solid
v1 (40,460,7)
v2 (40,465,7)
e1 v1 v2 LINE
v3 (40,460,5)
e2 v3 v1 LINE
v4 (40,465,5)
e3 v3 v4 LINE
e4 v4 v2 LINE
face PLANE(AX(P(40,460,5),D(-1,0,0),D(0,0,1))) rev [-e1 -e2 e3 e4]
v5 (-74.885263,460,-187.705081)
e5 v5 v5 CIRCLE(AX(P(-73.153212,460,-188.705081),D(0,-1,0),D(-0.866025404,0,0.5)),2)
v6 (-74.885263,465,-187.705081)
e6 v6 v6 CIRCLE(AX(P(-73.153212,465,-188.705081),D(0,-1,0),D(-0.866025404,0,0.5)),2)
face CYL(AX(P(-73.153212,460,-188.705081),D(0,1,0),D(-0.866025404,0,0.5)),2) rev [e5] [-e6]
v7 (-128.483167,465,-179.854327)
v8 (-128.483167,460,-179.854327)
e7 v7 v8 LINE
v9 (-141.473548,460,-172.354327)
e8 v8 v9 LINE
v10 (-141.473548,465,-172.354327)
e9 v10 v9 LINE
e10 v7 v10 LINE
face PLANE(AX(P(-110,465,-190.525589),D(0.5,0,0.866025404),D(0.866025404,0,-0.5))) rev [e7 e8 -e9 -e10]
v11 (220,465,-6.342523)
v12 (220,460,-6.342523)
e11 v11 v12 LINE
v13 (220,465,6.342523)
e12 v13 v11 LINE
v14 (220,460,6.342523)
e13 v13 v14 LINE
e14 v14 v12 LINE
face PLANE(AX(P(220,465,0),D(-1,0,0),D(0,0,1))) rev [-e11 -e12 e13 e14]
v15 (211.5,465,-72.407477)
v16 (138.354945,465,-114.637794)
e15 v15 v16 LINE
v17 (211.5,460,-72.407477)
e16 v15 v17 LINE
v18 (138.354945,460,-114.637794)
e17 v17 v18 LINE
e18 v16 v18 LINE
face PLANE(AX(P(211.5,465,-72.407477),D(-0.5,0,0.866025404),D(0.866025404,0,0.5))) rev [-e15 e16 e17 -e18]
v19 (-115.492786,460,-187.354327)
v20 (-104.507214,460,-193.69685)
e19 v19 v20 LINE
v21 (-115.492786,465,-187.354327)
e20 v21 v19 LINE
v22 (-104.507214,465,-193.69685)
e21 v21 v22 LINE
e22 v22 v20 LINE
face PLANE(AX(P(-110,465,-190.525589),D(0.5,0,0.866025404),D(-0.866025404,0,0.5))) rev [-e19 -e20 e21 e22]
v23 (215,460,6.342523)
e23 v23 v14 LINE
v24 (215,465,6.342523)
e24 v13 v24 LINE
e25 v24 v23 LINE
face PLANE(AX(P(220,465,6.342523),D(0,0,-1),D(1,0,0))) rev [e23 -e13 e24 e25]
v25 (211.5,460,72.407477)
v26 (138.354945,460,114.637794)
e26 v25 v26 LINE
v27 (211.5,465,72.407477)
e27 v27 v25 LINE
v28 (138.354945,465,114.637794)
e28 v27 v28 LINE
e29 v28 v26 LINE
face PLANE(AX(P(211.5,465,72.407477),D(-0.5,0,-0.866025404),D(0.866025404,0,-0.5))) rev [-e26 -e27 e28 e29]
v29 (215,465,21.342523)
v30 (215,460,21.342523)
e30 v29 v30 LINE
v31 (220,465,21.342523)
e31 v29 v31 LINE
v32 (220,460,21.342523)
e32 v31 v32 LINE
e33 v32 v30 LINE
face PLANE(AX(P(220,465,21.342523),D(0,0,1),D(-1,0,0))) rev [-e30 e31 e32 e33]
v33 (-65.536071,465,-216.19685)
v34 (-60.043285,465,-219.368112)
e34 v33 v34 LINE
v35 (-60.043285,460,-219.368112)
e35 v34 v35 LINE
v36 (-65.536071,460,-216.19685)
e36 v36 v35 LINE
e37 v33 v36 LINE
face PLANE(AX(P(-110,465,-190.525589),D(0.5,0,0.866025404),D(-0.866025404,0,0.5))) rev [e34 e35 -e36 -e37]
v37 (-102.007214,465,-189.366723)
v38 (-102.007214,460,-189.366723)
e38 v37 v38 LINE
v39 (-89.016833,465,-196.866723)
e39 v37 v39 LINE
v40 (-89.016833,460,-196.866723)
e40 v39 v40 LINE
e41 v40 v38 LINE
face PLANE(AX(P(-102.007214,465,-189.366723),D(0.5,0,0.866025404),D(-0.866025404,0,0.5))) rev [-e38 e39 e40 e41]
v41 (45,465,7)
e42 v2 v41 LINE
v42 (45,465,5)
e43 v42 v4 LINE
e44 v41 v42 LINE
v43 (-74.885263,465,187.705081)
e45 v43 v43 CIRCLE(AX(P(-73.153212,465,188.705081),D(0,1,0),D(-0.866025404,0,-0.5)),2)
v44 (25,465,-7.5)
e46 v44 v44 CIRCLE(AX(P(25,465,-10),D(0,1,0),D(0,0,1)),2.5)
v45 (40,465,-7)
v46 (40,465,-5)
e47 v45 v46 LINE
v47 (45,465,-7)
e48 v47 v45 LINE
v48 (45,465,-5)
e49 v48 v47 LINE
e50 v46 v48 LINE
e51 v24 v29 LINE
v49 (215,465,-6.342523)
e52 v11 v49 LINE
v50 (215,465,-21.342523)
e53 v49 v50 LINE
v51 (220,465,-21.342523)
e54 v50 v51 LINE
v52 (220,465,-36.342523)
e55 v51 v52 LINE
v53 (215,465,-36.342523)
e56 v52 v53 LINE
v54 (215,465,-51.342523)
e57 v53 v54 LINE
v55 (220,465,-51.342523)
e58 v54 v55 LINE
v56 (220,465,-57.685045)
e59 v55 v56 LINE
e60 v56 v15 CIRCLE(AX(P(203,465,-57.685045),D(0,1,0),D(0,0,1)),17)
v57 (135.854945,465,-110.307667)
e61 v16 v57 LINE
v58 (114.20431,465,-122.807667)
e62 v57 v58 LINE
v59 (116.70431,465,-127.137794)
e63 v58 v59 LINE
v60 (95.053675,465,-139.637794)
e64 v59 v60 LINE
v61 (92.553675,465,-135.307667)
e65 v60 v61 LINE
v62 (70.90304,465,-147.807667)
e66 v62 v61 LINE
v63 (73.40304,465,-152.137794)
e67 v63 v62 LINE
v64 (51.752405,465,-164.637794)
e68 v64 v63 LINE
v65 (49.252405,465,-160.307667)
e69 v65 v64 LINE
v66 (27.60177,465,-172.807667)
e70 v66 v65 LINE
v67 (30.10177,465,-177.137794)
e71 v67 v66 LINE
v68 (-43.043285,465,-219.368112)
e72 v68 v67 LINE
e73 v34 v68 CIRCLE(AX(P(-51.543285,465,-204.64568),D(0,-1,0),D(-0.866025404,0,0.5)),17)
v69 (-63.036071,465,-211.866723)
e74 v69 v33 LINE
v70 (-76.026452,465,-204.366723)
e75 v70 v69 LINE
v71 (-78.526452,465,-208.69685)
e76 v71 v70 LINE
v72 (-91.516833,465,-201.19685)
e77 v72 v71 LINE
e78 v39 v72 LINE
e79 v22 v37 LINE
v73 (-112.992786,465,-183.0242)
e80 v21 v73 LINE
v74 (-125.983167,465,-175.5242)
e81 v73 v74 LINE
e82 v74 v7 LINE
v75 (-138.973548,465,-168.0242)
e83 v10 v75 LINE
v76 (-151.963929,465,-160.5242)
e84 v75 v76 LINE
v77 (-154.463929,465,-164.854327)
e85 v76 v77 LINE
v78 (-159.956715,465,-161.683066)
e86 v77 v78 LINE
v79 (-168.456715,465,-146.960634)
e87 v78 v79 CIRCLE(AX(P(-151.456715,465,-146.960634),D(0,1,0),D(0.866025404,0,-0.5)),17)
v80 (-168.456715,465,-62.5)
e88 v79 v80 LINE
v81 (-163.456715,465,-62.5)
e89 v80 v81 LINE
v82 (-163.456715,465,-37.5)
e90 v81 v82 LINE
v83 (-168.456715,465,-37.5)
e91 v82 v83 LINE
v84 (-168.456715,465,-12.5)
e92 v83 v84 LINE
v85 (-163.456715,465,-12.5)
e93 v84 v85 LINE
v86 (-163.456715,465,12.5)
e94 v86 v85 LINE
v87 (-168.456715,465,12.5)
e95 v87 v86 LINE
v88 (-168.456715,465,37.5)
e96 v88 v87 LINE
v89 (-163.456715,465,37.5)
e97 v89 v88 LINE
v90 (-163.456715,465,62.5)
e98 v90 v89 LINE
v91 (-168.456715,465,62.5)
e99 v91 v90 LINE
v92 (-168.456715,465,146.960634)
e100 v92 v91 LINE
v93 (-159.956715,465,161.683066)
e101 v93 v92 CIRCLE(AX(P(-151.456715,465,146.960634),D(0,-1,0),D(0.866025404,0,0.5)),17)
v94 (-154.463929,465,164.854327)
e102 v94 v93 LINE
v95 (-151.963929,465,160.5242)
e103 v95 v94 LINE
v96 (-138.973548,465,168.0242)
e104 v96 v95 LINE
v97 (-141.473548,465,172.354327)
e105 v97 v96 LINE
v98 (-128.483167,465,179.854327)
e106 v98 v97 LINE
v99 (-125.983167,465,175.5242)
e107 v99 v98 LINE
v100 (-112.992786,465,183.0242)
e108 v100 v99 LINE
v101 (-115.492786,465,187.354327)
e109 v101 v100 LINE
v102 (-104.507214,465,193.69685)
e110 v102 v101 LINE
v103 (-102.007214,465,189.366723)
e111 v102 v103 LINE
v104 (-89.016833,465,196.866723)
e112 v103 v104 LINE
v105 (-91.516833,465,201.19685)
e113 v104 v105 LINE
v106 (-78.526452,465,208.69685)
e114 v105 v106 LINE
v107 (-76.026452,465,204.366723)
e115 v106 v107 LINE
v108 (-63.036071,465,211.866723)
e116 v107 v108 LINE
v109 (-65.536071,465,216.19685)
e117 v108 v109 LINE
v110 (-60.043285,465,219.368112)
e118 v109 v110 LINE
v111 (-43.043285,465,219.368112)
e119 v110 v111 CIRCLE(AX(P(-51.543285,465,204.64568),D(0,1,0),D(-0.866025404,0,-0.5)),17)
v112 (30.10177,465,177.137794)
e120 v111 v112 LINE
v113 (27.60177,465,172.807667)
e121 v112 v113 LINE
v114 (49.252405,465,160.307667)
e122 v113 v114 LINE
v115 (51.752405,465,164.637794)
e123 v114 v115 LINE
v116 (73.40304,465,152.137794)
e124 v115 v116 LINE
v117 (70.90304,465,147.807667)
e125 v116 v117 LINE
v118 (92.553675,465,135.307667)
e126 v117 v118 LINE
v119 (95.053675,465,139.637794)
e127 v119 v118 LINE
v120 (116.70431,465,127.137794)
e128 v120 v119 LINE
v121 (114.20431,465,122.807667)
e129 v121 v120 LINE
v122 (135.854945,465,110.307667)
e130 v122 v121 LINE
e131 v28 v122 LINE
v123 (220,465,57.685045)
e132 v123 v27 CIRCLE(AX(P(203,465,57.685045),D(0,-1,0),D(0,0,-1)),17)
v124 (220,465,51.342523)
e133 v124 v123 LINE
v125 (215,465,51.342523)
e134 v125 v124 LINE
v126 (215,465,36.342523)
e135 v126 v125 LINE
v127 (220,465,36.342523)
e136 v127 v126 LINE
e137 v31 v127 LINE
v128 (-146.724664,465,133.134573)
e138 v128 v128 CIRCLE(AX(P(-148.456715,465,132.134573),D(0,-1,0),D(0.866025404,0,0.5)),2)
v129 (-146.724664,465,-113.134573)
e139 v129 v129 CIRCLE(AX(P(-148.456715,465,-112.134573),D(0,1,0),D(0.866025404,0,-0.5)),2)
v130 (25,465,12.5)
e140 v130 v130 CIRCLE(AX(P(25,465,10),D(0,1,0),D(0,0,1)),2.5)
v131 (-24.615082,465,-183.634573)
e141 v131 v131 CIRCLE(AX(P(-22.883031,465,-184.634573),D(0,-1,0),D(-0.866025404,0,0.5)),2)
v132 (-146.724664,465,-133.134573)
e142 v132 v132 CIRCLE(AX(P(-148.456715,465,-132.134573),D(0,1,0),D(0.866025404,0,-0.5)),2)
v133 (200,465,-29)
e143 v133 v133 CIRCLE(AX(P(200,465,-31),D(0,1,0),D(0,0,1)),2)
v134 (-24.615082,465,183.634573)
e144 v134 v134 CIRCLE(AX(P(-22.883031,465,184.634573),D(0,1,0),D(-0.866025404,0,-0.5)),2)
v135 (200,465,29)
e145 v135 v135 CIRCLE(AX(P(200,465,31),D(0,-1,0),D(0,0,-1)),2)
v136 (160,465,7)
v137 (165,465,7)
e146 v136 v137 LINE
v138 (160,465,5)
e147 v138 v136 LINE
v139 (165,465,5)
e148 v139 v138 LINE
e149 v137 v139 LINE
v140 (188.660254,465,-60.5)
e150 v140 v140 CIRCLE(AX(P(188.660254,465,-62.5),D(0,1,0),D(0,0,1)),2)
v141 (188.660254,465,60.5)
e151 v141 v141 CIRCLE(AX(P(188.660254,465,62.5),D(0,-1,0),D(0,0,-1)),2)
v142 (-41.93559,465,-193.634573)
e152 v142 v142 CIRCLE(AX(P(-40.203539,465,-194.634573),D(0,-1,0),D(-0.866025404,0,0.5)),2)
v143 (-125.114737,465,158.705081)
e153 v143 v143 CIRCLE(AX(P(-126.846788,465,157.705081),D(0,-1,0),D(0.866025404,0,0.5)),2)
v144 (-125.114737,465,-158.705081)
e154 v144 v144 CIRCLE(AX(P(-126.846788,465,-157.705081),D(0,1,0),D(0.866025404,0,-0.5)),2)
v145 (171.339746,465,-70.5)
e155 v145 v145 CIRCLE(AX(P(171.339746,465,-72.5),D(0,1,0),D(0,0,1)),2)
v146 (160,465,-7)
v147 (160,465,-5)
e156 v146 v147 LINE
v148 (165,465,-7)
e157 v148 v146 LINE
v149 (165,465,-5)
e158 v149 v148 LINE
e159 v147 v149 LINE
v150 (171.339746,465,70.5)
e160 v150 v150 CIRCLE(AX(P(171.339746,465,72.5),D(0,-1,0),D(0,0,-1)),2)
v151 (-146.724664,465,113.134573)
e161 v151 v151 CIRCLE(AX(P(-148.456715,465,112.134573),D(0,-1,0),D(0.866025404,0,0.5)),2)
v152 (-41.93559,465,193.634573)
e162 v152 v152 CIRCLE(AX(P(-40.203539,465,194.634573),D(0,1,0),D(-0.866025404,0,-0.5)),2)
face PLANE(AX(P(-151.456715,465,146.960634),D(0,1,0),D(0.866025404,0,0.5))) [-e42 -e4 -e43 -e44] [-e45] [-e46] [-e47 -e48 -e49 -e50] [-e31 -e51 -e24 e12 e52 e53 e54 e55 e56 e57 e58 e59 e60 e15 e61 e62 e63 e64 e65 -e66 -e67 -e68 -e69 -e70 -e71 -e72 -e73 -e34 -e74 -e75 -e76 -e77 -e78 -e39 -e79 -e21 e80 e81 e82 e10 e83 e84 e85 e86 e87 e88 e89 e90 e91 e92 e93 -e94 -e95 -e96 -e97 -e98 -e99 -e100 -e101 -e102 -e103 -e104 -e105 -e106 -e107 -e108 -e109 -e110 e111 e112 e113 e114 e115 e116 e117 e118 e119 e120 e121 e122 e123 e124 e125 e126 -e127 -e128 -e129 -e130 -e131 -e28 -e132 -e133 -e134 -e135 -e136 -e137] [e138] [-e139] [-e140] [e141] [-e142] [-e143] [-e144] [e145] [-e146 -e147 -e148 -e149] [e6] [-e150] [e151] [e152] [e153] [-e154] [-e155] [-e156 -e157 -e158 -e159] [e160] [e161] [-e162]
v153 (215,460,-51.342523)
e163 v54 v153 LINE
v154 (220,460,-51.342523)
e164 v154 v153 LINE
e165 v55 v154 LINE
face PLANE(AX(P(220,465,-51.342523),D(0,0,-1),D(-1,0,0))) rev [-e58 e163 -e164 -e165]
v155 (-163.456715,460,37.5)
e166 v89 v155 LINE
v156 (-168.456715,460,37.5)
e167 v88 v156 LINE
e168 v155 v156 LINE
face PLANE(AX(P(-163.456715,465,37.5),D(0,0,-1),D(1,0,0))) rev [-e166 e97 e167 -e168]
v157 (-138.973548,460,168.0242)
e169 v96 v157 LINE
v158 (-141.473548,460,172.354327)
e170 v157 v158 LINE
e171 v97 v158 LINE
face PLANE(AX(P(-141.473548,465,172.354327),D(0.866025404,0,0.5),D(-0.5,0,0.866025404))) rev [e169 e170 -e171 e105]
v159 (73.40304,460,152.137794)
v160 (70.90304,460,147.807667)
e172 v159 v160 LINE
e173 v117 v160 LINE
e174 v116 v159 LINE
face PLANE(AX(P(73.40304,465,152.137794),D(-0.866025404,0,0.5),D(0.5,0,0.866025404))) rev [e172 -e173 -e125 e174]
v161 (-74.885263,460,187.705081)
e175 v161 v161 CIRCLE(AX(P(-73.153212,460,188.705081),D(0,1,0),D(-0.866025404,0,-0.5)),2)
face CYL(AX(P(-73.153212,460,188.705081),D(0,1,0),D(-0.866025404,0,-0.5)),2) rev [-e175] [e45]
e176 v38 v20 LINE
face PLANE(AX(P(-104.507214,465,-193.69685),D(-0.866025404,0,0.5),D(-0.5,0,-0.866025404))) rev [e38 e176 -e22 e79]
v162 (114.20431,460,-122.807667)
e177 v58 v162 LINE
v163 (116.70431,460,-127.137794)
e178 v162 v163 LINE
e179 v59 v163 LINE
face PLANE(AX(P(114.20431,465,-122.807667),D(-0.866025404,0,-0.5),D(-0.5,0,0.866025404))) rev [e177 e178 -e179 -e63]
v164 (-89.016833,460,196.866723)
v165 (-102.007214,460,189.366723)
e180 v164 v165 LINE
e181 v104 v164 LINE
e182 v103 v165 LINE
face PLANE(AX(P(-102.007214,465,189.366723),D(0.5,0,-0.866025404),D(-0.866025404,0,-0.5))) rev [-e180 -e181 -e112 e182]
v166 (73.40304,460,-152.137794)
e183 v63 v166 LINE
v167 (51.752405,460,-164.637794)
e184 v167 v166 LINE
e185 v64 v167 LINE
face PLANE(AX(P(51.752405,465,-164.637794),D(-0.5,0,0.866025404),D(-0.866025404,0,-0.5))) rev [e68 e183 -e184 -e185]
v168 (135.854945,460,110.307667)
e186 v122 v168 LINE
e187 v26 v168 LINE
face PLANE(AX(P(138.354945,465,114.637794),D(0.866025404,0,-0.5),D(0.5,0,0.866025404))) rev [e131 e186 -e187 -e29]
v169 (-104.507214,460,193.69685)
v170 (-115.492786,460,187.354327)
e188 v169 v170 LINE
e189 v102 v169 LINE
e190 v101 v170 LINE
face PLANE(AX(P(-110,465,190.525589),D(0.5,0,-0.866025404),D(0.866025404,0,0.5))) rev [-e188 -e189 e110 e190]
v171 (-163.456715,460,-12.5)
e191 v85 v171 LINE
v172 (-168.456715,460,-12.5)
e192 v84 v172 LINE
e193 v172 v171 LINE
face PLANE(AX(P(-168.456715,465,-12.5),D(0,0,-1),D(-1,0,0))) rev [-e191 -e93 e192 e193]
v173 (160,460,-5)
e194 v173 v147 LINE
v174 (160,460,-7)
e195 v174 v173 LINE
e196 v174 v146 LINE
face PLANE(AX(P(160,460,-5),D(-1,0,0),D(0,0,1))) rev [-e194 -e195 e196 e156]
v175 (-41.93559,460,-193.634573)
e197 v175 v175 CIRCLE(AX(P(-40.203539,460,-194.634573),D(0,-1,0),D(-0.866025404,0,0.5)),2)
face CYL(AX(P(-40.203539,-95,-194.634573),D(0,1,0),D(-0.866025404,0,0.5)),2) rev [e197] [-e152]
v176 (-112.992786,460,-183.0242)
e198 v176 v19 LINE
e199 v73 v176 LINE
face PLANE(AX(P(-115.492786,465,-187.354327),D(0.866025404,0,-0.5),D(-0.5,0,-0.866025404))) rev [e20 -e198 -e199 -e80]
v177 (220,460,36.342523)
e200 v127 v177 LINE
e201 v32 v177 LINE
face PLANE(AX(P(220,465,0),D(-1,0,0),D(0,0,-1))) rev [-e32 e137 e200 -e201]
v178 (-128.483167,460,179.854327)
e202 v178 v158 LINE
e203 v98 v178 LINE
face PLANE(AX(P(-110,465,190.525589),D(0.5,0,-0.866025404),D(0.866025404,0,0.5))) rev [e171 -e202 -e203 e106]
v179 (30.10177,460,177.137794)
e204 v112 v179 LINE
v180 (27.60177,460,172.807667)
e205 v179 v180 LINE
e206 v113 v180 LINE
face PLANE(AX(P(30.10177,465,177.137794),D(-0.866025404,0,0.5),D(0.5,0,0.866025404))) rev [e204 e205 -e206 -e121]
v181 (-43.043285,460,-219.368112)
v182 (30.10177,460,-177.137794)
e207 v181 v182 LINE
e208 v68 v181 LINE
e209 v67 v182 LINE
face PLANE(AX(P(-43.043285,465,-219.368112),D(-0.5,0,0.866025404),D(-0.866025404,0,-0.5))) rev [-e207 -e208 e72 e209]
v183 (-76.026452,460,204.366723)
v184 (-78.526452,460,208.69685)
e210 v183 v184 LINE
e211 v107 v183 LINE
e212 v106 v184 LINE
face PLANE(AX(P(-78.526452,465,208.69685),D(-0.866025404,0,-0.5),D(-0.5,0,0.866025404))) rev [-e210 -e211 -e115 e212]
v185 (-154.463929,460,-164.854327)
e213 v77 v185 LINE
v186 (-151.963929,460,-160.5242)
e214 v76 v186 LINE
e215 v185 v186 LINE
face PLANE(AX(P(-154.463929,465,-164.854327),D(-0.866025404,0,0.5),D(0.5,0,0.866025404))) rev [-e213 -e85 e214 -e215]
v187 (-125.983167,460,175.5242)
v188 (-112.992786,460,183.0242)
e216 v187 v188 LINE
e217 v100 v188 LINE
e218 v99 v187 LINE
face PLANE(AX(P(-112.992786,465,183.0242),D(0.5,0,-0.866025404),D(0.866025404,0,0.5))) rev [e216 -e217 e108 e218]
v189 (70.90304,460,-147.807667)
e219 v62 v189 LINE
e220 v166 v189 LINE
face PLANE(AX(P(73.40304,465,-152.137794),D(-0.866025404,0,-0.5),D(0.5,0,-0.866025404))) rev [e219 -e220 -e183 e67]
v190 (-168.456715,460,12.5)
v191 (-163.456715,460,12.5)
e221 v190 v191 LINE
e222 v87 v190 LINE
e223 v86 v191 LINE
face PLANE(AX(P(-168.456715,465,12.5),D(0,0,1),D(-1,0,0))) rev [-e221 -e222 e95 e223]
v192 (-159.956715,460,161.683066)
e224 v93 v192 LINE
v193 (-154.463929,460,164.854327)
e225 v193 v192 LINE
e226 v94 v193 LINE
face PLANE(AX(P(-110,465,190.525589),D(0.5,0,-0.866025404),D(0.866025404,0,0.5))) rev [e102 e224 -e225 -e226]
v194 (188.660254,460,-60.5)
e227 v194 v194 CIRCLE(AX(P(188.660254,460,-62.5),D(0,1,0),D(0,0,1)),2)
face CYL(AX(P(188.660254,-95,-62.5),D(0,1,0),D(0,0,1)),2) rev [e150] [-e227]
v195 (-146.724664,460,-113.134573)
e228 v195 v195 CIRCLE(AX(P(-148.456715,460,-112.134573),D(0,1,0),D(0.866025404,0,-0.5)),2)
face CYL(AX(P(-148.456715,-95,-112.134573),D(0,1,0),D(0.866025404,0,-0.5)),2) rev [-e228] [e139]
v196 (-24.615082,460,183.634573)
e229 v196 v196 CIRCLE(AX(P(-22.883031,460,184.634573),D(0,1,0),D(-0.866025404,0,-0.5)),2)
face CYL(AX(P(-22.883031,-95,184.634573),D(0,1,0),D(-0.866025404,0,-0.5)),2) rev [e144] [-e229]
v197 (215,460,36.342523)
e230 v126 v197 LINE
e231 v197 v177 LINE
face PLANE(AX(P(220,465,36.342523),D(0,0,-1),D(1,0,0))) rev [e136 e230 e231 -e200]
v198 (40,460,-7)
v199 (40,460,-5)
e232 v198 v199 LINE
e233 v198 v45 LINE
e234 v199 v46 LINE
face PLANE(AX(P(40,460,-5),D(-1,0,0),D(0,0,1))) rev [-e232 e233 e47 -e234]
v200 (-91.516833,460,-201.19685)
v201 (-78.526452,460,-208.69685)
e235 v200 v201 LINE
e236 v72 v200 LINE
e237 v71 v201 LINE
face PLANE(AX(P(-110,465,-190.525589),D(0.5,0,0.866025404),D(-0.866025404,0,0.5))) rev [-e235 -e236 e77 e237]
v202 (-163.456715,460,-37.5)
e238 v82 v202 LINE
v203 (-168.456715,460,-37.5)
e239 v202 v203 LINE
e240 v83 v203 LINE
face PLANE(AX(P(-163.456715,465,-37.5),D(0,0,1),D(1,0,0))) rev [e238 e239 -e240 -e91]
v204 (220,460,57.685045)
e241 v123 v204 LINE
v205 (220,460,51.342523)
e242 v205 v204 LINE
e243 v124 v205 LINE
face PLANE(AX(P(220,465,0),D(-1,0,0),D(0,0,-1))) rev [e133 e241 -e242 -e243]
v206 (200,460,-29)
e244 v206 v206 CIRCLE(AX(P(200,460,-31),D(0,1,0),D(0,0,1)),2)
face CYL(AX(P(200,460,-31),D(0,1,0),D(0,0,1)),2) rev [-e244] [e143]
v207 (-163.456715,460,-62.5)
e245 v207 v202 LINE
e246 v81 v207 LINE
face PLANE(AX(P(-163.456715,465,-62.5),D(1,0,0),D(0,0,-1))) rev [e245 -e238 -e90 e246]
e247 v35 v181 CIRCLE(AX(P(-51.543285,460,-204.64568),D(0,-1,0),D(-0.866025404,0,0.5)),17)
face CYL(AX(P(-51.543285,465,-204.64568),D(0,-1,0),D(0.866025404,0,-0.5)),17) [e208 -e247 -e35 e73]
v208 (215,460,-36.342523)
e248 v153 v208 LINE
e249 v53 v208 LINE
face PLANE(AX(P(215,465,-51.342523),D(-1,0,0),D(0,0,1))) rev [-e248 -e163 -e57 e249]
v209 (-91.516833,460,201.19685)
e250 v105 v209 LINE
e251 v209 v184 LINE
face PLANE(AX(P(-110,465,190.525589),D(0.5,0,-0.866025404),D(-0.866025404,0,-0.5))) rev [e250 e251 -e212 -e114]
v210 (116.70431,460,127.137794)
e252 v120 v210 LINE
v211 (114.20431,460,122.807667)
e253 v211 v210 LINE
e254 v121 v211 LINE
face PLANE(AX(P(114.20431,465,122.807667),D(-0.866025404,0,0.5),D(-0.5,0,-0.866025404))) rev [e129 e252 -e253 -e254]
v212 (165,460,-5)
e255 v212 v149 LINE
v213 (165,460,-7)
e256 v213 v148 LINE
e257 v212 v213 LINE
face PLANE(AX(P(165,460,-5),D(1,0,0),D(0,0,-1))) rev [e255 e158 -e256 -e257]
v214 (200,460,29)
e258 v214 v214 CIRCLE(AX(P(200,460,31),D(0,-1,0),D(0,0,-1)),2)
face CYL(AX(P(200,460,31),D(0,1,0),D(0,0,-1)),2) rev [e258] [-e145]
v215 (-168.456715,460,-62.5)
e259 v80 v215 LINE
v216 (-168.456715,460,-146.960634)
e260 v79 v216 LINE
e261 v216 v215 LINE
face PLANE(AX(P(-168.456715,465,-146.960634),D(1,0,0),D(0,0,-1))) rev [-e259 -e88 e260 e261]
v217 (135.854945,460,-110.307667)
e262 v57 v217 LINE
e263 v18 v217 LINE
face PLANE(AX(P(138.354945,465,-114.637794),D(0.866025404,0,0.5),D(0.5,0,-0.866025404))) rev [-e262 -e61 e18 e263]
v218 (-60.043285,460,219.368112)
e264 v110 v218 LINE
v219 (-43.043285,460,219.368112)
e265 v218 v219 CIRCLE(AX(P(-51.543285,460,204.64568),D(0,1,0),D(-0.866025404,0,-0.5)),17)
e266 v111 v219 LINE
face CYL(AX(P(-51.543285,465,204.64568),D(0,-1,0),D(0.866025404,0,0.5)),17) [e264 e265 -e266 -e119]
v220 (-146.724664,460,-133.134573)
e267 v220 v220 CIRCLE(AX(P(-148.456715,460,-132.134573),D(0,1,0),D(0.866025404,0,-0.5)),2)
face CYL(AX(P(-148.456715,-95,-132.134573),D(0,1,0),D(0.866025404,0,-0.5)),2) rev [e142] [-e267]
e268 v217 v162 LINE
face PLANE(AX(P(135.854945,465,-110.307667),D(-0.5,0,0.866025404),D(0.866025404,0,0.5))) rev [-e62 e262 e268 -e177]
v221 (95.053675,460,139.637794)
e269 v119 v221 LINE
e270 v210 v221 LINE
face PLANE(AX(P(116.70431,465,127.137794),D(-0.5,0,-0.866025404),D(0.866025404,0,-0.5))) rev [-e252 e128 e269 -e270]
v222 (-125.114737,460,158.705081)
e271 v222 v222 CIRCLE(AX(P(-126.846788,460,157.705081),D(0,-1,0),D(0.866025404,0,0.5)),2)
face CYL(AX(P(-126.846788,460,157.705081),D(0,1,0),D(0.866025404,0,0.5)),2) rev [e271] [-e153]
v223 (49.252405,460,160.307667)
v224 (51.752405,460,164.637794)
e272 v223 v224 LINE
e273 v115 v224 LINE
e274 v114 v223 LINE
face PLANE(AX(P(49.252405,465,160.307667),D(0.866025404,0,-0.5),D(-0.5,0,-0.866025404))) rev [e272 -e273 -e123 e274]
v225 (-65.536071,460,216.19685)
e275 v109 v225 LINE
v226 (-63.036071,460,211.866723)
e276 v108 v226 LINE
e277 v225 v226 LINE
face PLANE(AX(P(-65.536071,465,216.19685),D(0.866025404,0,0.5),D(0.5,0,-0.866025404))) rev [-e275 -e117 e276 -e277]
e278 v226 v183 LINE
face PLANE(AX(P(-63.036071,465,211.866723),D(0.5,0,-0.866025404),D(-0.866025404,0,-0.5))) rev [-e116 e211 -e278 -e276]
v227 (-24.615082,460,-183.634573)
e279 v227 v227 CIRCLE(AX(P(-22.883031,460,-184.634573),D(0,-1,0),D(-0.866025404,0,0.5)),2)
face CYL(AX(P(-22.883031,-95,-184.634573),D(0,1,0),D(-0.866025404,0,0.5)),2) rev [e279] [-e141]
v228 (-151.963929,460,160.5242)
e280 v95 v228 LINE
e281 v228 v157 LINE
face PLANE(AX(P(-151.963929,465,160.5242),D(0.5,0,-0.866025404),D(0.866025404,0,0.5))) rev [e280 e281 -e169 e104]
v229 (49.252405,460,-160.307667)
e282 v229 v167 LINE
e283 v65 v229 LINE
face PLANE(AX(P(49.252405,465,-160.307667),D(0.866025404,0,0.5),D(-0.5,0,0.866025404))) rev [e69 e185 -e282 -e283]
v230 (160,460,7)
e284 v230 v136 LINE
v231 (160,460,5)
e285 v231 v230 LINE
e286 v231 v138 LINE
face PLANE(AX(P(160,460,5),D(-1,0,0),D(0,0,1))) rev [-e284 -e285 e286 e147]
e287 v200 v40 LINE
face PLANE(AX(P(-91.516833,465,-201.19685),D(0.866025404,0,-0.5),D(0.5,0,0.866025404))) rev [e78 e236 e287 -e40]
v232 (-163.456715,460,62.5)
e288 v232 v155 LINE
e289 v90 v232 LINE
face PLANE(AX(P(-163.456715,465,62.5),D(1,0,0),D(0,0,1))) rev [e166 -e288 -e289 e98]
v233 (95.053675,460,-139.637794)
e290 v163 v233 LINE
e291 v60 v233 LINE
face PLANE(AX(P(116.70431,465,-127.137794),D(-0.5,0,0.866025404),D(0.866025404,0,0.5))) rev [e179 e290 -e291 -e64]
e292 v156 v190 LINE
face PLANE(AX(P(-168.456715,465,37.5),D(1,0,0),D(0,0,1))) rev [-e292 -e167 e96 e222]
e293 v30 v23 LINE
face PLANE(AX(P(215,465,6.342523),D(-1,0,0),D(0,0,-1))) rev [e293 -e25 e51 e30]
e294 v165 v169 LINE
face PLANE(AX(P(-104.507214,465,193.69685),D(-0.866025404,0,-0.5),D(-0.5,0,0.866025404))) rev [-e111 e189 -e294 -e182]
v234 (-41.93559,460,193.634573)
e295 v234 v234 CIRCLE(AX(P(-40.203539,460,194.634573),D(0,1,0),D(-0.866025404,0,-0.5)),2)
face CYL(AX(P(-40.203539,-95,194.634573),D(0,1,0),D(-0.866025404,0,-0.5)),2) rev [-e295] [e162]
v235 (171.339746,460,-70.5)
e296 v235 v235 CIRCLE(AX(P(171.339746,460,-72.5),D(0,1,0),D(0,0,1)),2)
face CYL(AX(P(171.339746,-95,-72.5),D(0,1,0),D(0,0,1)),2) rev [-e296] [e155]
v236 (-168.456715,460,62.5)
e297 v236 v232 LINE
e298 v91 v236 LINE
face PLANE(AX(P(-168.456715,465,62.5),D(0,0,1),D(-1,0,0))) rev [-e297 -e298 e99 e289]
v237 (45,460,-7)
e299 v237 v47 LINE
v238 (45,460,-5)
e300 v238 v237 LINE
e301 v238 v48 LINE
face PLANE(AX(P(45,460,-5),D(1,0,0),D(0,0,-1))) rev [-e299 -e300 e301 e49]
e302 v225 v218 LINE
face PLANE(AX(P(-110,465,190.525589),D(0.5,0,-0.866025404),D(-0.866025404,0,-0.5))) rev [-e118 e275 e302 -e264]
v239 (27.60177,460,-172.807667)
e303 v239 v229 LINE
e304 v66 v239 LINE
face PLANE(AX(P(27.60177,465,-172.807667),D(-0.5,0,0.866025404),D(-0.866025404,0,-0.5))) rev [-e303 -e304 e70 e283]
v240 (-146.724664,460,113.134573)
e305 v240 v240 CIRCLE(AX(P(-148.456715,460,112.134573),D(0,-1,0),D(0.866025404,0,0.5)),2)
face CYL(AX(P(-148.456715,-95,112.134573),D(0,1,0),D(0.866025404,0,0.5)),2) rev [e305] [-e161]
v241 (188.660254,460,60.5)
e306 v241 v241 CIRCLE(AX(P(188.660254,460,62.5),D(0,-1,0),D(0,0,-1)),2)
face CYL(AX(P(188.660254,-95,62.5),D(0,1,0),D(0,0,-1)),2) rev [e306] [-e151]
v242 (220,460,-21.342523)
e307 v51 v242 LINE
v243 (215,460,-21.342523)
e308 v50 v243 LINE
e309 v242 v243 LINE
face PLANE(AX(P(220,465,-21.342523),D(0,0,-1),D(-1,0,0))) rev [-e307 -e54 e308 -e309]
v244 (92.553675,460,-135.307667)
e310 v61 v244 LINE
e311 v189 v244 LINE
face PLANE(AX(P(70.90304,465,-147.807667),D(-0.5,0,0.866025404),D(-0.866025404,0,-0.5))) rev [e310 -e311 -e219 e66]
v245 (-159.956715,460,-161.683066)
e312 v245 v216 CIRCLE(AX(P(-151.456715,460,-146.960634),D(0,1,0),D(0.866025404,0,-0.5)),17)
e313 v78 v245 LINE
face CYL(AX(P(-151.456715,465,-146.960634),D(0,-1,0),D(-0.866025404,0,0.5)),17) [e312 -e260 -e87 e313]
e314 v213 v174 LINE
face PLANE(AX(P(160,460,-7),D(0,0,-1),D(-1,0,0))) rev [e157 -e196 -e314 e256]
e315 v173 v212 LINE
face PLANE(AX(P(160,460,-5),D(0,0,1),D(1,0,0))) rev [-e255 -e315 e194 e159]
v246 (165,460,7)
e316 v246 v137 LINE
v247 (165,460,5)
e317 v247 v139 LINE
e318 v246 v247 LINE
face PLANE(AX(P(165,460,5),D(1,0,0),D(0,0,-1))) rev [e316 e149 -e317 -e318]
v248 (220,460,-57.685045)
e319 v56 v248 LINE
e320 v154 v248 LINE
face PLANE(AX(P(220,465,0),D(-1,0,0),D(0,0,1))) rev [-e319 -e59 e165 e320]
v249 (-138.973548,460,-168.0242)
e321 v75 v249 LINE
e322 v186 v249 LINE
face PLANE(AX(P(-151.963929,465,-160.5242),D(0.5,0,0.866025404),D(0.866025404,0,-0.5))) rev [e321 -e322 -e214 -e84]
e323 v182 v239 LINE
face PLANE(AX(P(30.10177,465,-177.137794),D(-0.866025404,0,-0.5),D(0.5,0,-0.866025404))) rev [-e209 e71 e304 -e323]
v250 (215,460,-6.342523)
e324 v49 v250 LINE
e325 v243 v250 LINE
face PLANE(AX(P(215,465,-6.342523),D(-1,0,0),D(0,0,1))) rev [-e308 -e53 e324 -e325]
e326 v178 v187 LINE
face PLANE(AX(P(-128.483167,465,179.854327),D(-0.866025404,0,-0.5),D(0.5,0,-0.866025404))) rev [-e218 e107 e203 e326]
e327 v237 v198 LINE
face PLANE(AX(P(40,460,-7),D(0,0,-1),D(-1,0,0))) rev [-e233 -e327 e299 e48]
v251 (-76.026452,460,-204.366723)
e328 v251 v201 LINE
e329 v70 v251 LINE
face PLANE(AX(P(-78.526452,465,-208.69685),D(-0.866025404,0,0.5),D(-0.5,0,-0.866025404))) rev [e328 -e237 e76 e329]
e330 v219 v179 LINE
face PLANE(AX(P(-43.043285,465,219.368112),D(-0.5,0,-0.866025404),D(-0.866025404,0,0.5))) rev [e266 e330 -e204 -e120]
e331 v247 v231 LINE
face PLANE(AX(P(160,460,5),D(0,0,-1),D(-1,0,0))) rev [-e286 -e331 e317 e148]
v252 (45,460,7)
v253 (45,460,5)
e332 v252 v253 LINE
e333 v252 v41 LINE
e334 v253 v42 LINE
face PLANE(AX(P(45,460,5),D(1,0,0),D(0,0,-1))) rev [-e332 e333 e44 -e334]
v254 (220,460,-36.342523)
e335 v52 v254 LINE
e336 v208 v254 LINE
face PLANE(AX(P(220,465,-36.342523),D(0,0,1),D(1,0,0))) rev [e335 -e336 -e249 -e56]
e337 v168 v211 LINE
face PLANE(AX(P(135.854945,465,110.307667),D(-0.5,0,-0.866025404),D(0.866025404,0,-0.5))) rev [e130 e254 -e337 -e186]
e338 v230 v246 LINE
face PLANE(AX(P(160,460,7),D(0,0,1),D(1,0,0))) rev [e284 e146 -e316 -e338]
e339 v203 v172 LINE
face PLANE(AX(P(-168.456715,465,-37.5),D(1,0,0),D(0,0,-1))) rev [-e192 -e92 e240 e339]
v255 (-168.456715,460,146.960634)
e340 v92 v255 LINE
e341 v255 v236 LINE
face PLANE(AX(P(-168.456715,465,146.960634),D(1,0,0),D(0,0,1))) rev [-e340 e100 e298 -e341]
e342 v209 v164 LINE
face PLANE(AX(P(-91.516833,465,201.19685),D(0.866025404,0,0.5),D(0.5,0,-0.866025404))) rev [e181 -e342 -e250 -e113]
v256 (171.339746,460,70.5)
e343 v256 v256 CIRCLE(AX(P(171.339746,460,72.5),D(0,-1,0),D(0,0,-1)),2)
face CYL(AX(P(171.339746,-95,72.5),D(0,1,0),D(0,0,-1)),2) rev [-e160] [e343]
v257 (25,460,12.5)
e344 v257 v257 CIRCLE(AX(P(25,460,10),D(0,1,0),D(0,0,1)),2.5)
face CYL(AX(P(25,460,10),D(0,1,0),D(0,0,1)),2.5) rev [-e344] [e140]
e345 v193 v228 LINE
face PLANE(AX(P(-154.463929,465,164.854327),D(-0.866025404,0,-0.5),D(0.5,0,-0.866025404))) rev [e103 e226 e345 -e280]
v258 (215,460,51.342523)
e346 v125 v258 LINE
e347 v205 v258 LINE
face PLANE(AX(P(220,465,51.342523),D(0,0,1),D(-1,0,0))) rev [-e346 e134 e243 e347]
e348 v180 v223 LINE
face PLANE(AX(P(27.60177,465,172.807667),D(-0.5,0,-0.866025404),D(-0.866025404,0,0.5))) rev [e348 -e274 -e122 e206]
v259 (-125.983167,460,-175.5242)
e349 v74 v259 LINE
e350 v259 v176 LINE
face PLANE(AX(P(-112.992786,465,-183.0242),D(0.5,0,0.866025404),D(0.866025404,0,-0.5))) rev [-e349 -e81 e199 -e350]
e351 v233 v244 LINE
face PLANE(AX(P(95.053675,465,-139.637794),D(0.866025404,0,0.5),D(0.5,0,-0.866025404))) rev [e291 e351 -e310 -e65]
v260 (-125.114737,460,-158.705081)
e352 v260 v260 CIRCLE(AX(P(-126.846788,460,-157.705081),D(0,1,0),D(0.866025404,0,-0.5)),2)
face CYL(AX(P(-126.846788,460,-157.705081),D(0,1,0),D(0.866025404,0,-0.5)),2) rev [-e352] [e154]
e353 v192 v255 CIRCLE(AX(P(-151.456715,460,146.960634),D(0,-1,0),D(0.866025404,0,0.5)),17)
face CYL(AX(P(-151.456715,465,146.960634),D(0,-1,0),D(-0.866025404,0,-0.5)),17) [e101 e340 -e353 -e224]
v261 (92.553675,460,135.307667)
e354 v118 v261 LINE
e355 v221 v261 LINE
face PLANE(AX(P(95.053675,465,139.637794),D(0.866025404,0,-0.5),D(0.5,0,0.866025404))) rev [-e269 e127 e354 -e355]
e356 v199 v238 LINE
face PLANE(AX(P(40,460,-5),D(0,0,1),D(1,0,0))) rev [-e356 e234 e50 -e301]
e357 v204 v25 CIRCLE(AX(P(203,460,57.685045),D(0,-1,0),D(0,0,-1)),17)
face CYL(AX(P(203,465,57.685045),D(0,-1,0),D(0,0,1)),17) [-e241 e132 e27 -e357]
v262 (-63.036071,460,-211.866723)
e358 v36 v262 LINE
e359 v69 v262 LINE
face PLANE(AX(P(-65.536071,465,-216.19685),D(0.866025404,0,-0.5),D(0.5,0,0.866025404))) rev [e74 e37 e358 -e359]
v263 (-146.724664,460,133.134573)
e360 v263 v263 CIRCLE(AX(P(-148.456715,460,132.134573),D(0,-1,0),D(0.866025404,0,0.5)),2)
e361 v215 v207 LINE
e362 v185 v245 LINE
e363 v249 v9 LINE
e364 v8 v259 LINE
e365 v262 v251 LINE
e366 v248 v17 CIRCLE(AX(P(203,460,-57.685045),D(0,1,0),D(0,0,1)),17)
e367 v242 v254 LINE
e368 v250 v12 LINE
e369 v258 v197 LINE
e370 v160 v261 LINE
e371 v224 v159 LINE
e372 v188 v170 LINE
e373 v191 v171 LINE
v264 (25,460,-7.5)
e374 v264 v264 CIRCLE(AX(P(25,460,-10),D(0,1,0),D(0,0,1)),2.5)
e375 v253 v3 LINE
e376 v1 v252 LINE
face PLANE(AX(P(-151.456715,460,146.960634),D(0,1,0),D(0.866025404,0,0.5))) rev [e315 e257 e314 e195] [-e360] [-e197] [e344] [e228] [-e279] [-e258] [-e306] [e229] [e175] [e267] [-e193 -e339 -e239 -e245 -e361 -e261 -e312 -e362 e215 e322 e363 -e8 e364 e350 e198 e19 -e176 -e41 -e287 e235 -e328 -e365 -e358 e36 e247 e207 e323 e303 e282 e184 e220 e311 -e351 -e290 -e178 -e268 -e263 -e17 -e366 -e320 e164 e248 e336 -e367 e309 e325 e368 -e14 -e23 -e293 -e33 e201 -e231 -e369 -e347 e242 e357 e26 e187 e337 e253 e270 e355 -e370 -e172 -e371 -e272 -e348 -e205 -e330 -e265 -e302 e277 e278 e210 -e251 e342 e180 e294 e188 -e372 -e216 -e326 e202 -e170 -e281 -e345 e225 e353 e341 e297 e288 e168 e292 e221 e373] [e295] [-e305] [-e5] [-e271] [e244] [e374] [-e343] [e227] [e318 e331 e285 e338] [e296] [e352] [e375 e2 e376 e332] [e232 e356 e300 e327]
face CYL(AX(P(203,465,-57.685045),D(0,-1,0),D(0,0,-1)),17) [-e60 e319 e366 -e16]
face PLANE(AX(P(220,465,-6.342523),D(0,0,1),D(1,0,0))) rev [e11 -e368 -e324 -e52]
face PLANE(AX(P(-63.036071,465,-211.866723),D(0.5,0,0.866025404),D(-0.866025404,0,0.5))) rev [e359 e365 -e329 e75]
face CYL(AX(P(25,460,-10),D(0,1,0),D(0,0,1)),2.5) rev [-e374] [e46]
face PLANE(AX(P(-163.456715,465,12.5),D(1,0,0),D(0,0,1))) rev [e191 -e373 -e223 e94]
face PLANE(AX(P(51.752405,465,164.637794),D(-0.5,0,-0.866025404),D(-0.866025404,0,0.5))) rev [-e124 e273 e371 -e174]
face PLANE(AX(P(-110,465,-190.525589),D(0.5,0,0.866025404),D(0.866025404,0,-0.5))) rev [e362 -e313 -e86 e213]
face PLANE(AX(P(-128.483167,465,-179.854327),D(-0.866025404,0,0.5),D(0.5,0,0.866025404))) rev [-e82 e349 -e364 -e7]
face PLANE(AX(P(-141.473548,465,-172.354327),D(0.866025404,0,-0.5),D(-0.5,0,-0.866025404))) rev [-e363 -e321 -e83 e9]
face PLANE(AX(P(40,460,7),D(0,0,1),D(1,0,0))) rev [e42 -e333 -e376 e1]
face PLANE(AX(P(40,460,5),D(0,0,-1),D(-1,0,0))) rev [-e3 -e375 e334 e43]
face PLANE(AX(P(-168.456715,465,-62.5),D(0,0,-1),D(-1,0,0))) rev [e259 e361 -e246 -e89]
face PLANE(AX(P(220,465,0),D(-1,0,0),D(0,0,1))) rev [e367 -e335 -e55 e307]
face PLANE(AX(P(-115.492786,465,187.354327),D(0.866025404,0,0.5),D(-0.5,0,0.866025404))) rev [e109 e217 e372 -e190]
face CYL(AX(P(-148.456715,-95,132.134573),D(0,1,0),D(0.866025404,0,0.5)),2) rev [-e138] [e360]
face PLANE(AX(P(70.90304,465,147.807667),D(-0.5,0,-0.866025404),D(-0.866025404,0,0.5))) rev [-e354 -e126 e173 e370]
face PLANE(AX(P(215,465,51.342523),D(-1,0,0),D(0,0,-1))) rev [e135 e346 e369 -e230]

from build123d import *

# Parameters (mm, degrees)
STOCK_FRAME_START              = 460
STOCK_FRAME_MASTER_1_OUTLINE_R = 2
STOCK_FRAME_MASTER_1_DEPTH     = 5
SKETCH4_R                      = 2
CUT_EXTRUDE3_DEPTH             = 262.655447486
SKETCH1_R                      = 2.5
CUT_EXTRUDE1_DEPTH             = 313.332847009
SKETCH2_W                      = 5
SKETCH2_H                      = 2
CUT_EXTRUDE2_DEPTH             = 313.332847009


# Read off the part's stored shape, not the designer's step: Stock-Frame master-1
with BuildPart() as part:
    # Stock-Frame master-1 outline → Stock-Frame master-1 (new body)
    with BuildSketch(Plane(origin=(0, 0, 0), x_dir=(1, 0, 0), z_dir=(0, 1, 0)).offset(STOCK_FRAME_START)):
        with BuildLine():
            Line((220, 51.342522712), (220, 57.685045424))
            ThreePointArc((220, 57.685045424), (217.722431864, 66.185045424), (211.5, 72.407477288))
            Line((211.5, 72.407477288), (138.354945114, 114.637794416))
            Line((138.354945114, 114.637794416), (135.854945114, 110.307667397))
            Line((135.854945114, 110.307667397), (114.20431002, 122.807667397))
            Line((114.20431002, 122.807667397), (116.70431002, 127.137794416))
            Line((116.70431002, 127.137794416), (95.053674925, 139.637794416))
            Line((95.053674925, 139.637794416), (92.553674925, 135.307667397))
            Line((92.553674925, 135.307667397), (81.728357378, 141.557667397))
            Line((81.728357378, 141.557667397), (0, 0))
            Line((0, 0), (220, 0))
            Line((220, 0), (220, 6.342522712))
            Line((220, 6.342522712), (215, 6.342522712))
            Line((215, 6.342522712), (215, 21.342522712))
            Line((215, 21.342522712), (220, 21.342522712))
            Line((220, 21.342522712), (220, 36.342522712))
            Line((220, 36.342522712), (215, 36.342522712))
            Line((215, 36.342522712), (215, 51.342522712))
            Line((215, 51.342522712), (220, 51.342522712))
        make_face()
        with Locations((188.660254038, 62.5)):
            Circle(STOCK_FRAME_MASTER_1_OUTLINE_R, mode=Mode.SUBTRACT)
        with Locations((171.339745962, 72.5)):
            Circle(STOCK_FRAME_MASTER_1_OUTLINE_R, mode=Mode.SUBTRACT)
    extrude(amount=STOCK_FRAME_MASTER_1_DEPTH)

    # Sketch4 → Cut-Extrude3 (cut, through all)
    with BuildSketch(Plane(origin=(0, 465, 0), x_dir=(1, 0, 0), z_dir=(0, 1, 0))):
        with Locations(Location((200, 31, 0), (0, 0, 270))):
            Circle(SKETCH4_R)
    extrude(amount=-CUT_EXTRUDE3_DEPTH, mode=Mode.SUBTRACT)

    # Mirror1: part across plane


with BuildPart() as part_1:
    add(part.part)
    add(part.part.mirror(Plane(origin=(0, 465, 0), x_dir=(1, 0, 0), z_dir=(0, 0, -1))))


with BuildPart() as body_2:
    # Mirror2: mirrored copy
    add(part_1.part.mirror(Plane(origin=(81.728357378, 465, -141.557667397), x_dir=(-0.49999999999999395, 0, 0.866025403784442), z_dir=(0.8660254037844421, 0, 0.49999999999999395))))


with BuildPart() as body_3:
    # Mirror3: mirrored copy
    add(part_1.part.mirror(Plane(origin=(81.728357378, 465, 141.557667397), x_dir=(0.49999999999999395, 0, 0.866025403784442), z_dir=(0.8660254037844421, 0, -0.49999999999999395))))

    # Combine1: union body 2, part
    add(body_2.part)
    add(part_1.part)

    # Sketch1 → Cut-Extrude1 (cut, through all)
    with BuildSketch(Plane(origin=(0, 465, 0), x_dir=(1, 0, 0), z_dir=(0, 1, 0))):
        with Locations(Location((25, 10, 0), (0, 0, 270))):
            Circle(SKETCH1_R)
        with Locations(Location((25, -10, 0), (0, 0, 270))):
            Circle(SKETCH1_R)
    extrude(amount=-CUT_EXTRUDE1_DEPTH, mode=Mode.SUBTRACT)

    # Sketch2 → Cut-Extrude2 (cut, through all)
    with BuildSketch(Plane(origin=(0, 465, 0), x_dir=(1, 0, 0), z_dir=(0, 1, 0))):
        with Locations((42.5, 6)):
            Rectangle(SKETCH2_W, SKETCH2_H)
        with Locations((42.5, -6)):
            Rectangle(SKETCH2_W, SKETCH2_H)
        with Locations((162.5, 6)):
            Rectangle(SKETCH2_W, SKETCH2_H)
        with Locations((162.5, -6)):
            Rectangle(SKETCH2_W, SKETCH2_H)
    extrude(amount=-CUT_EXTRUDE2_DEPTH, mode=Mode.SUBTRACT)


solid = body_3.part
